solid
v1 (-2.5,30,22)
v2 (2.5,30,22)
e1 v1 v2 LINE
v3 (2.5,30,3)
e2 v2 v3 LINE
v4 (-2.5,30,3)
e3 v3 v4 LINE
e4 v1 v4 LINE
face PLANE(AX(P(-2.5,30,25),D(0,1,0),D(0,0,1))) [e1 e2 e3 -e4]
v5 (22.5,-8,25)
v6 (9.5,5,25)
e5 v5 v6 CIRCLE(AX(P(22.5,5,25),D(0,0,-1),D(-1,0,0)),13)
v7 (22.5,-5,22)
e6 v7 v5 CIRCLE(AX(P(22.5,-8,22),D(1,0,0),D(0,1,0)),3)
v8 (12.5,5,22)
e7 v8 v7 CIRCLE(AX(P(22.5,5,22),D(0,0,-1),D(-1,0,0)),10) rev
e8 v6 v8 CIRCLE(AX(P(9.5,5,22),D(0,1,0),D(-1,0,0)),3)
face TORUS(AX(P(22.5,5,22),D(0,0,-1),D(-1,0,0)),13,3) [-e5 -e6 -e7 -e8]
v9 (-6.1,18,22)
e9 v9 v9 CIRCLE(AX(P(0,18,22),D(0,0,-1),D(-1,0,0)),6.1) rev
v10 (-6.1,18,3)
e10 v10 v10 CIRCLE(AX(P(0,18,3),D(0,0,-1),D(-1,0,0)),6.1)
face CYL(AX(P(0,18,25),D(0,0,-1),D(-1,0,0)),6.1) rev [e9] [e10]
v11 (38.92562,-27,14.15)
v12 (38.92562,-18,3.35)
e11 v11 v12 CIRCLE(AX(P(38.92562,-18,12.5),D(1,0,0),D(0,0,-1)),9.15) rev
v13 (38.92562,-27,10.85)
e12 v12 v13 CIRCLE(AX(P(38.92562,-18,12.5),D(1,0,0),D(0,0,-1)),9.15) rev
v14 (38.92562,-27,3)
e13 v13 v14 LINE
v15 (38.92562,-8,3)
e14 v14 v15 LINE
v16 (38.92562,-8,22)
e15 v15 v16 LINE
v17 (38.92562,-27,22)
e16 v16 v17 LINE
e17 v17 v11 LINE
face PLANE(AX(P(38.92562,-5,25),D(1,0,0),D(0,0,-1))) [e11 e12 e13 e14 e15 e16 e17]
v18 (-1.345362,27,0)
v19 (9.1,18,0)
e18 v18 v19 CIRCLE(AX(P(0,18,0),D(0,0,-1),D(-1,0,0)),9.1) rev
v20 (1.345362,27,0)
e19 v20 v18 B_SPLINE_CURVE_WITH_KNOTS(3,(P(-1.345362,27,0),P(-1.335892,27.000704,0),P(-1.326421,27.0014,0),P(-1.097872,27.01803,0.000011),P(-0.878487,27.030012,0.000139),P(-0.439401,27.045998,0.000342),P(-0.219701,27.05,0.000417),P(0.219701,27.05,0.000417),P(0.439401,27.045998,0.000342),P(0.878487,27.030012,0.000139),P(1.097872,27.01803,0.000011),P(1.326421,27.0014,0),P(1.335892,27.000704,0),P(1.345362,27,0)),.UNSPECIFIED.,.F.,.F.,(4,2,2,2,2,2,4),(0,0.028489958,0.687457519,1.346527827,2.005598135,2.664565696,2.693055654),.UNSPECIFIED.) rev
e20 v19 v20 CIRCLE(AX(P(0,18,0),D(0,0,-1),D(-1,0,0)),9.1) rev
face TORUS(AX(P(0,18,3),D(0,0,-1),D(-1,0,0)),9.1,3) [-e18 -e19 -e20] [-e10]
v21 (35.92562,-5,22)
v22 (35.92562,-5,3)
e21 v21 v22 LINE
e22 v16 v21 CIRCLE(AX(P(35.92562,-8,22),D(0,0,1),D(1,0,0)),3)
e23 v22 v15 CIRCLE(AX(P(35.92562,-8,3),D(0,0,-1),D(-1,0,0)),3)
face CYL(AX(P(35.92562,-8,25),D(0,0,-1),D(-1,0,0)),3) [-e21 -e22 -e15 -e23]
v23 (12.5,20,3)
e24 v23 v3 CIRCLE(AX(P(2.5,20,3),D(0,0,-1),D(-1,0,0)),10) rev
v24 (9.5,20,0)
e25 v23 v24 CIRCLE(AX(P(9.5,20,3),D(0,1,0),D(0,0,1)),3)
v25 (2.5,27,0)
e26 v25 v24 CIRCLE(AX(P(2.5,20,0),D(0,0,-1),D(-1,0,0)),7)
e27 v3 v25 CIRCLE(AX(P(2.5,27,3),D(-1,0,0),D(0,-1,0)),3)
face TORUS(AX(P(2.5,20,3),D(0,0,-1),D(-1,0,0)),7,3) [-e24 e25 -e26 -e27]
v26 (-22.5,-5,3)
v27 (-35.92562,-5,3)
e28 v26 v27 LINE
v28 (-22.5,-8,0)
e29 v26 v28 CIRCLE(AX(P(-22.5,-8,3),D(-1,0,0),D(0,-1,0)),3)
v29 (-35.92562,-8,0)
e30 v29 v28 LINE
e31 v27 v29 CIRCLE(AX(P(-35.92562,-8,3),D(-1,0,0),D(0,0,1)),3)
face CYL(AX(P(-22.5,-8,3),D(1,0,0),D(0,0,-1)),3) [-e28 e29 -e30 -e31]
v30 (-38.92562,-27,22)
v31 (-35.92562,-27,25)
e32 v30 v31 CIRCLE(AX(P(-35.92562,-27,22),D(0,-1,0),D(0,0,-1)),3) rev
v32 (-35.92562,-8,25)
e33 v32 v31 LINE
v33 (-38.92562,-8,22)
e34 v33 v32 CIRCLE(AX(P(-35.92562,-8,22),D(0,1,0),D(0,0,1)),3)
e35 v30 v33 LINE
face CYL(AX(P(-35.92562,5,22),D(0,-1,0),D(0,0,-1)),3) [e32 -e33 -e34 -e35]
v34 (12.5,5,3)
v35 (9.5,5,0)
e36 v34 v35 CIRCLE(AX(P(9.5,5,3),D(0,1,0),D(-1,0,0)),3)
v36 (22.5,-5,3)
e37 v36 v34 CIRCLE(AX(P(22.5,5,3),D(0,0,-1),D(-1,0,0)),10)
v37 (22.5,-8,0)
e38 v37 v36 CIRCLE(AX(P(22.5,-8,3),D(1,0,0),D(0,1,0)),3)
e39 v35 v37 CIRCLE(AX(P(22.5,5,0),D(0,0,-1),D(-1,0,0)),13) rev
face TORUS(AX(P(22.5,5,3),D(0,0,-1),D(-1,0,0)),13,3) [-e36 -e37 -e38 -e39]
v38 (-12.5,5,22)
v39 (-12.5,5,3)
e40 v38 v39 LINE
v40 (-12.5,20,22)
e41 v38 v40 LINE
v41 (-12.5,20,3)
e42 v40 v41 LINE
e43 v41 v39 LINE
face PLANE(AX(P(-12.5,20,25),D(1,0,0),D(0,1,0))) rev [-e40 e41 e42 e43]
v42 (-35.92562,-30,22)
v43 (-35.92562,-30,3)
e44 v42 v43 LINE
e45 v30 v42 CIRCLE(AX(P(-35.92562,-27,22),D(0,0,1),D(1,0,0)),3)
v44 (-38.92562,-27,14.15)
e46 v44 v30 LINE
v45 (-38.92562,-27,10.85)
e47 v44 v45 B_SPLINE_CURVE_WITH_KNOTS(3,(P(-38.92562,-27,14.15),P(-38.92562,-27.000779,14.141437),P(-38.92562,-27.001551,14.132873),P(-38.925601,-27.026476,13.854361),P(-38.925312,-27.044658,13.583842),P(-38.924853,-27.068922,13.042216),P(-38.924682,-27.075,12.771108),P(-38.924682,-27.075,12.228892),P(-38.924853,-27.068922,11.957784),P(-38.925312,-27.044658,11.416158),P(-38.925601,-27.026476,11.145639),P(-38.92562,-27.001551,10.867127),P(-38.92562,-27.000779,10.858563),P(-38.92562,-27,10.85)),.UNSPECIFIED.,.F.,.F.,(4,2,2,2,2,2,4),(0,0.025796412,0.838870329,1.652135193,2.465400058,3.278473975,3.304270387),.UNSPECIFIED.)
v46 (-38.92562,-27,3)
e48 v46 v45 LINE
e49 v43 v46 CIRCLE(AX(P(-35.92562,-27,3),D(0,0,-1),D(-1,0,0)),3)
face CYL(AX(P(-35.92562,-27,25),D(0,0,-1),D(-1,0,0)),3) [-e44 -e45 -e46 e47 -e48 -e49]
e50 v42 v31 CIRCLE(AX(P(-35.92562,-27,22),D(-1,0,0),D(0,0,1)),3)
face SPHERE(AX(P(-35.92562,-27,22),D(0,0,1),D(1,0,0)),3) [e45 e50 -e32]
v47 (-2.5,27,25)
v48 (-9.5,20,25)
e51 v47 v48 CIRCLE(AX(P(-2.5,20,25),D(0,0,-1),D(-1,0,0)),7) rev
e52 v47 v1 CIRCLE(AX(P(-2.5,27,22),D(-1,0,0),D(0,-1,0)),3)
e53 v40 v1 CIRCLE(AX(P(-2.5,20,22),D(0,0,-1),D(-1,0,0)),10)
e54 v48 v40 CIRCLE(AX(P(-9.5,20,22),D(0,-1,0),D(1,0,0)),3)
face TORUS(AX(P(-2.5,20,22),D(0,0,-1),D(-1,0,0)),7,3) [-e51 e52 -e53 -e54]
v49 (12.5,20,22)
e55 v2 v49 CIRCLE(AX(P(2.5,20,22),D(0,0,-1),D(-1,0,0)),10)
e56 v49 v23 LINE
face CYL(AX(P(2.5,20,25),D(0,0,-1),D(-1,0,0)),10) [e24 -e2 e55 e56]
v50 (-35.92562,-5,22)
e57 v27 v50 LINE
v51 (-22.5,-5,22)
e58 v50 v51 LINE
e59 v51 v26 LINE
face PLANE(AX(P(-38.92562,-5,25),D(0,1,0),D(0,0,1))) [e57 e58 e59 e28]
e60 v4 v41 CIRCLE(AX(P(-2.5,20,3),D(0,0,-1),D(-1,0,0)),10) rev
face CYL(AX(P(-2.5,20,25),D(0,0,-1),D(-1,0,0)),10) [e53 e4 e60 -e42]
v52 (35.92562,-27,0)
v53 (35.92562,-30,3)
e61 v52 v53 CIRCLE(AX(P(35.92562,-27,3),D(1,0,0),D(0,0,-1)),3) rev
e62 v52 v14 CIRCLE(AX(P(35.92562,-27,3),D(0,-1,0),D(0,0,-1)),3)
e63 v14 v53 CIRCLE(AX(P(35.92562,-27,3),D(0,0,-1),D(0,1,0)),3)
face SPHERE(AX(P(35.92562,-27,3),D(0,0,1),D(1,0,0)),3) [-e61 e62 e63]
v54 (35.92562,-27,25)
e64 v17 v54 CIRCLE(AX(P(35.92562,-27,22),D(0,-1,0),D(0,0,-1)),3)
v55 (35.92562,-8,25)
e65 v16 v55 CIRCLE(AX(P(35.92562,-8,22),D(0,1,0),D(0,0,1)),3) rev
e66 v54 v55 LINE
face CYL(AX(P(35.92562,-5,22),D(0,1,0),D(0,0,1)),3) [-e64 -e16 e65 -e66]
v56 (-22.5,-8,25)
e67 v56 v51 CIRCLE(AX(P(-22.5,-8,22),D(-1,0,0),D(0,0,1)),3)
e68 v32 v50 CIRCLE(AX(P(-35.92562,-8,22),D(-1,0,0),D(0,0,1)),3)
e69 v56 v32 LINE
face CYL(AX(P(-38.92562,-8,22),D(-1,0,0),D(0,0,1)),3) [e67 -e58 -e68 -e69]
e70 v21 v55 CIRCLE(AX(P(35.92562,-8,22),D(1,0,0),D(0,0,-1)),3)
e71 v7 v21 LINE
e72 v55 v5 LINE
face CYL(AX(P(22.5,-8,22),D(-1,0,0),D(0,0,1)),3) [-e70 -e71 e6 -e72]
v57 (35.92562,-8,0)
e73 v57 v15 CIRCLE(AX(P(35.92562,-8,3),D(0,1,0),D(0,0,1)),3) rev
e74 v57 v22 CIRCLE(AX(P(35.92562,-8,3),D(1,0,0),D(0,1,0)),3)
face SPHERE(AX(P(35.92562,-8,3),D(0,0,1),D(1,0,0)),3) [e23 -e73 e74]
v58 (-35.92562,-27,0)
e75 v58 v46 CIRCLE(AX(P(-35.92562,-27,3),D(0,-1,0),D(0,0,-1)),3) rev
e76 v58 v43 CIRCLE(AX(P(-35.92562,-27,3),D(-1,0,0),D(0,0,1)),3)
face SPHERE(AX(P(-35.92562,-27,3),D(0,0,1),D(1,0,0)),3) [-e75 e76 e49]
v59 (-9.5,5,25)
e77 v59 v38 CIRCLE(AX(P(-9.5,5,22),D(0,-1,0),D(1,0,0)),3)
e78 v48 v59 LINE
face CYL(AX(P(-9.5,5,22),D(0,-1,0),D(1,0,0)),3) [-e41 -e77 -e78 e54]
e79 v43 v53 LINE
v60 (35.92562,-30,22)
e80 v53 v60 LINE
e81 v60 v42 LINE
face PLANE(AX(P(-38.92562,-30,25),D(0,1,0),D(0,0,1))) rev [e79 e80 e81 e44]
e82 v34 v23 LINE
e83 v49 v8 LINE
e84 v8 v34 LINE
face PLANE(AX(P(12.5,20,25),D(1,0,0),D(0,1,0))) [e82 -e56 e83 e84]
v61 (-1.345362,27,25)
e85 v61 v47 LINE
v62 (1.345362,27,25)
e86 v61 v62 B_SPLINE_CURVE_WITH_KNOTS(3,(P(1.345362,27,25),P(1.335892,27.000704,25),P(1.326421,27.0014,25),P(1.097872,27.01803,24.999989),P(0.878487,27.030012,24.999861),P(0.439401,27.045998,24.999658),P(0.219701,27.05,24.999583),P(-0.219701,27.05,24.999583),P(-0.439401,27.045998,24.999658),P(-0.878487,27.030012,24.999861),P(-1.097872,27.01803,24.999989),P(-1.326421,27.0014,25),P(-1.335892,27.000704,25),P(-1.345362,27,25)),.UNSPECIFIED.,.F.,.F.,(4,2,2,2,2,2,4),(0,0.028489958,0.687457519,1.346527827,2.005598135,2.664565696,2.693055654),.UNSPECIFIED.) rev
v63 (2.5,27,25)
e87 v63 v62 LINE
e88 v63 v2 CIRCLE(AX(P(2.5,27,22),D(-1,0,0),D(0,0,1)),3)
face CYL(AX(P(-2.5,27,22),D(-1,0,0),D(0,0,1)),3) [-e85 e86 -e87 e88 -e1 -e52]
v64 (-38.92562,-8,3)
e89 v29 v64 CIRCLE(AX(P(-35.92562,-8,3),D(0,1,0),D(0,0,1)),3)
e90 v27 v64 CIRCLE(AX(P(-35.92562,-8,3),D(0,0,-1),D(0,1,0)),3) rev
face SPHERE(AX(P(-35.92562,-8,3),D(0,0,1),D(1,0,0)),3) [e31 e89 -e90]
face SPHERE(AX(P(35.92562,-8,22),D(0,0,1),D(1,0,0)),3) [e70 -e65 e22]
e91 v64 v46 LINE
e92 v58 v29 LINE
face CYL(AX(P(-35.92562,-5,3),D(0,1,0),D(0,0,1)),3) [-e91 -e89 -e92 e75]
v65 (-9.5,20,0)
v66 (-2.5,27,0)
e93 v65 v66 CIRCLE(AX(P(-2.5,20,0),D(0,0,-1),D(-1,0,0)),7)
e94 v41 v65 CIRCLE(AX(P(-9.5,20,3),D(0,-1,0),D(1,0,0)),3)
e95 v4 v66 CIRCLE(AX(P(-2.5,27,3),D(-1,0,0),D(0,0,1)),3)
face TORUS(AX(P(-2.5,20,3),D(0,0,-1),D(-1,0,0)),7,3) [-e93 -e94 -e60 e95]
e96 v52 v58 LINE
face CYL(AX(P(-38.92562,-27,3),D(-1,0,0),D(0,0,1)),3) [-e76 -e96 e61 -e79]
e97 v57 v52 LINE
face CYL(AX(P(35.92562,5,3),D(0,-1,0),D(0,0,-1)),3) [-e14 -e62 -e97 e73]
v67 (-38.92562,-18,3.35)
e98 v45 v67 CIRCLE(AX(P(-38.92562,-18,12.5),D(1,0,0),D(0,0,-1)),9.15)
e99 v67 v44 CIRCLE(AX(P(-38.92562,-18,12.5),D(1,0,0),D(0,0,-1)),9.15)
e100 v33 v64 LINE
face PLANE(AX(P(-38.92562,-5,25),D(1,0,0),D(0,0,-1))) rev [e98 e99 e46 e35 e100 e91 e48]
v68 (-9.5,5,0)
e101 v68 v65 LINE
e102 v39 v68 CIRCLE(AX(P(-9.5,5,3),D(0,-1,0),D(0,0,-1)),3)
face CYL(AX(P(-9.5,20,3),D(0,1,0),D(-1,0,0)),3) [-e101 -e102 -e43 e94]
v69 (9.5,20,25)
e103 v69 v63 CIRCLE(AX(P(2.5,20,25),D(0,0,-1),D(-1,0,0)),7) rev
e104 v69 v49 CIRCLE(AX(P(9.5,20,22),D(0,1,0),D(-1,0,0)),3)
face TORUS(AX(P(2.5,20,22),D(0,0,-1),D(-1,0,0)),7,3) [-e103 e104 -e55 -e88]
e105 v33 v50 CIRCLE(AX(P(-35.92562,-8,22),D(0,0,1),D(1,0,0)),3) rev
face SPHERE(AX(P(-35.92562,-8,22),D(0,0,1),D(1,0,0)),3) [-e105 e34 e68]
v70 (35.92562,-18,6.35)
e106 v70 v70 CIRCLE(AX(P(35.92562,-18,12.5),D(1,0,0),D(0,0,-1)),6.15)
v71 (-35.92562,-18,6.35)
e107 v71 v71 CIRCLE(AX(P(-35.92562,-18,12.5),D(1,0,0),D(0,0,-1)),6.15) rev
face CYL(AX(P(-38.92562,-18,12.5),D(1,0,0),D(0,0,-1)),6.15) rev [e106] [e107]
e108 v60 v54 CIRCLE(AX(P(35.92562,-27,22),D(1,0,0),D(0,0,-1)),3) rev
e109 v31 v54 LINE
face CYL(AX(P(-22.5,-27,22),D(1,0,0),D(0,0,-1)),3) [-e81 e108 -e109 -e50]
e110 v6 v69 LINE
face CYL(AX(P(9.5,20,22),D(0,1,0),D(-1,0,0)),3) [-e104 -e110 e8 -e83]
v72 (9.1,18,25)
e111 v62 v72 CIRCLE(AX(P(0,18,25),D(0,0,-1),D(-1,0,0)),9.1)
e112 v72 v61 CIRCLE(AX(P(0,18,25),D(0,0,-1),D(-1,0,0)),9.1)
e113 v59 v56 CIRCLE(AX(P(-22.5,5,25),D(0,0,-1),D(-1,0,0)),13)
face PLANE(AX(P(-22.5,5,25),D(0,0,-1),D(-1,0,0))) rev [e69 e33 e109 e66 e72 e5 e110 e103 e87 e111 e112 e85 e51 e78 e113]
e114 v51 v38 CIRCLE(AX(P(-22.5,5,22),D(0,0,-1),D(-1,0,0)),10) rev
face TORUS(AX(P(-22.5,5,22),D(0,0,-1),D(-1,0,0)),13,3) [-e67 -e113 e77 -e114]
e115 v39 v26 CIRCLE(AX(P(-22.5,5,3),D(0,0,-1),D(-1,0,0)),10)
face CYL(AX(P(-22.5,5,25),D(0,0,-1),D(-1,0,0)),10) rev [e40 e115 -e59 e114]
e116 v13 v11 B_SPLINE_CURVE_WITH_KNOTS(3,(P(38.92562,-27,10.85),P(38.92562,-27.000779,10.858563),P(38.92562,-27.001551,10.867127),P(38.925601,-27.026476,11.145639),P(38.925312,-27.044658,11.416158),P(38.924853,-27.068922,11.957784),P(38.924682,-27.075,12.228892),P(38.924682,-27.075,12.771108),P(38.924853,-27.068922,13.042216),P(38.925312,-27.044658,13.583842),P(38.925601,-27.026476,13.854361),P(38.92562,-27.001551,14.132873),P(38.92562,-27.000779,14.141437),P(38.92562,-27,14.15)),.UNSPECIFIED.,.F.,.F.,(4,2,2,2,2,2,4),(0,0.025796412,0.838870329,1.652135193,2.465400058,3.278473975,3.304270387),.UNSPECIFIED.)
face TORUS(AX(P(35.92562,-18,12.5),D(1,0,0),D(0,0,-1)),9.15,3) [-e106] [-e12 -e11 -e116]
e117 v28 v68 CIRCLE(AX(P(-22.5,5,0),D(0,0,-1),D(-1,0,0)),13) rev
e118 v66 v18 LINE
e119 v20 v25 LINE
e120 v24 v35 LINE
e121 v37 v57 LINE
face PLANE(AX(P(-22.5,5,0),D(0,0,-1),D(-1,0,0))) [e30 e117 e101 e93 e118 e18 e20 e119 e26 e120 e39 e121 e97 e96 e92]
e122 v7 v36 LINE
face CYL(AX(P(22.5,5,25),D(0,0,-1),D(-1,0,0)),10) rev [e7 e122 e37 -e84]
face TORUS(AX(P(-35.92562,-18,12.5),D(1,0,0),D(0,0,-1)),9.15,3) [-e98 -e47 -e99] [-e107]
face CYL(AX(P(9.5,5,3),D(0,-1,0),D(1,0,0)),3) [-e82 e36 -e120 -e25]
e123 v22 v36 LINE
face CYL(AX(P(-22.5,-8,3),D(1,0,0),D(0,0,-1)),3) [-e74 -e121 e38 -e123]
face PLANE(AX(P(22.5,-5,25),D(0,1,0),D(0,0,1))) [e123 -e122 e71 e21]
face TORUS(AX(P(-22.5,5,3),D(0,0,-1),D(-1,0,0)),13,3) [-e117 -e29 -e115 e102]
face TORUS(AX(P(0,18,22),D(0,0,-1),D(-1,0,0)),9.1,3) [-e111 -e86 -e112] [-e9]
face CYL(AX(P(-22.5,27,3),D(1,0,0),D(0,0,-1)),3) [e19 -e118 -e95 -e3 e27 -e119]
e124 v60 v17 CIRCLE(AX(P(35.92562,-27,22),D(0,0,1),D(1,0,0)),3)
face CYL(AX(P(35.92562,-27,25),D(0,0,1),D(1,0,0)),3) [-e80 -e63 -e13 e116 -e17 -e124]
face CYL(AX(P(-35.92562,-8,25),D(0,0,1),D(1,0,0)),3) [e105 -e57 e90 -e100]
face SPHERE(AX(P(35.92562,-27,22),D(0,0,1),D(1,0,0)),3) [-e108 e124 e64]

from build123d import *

# Parameters (mm, degrees)
SKETCH1_R           = 6.1
BOSS_EXTRUDE1_DEPTH = 25
SKETCH2_R           = 6.15
CUT_EXTRUDE1_DEPTH  = 88.09658729287669
FILLET1_R           = 3


with BuildPart() as part:
    # Sketch1 → Boss-Extrude1 (new body)
    with BuildSketch(Plane.XY):
        with BuildLine():
            Line((22.500000000000078, -5.000000000000004), (38.925619834710695, -5.000000000000004))
            Line((38.925619834710695, -5.000000000000004), (38.925619834710695, -30.000000000000007))
            Line((38.925619834710695, -30.000000000000007), (-38.92561983471068, -30.000000000000007))
            Line((-38.92561983471068, -30.000000000000007), (-38.92561983471068, -5.000000000000004))
            Line((-38.92561983471068, -5.000000000000004), (-22.500000000000068, -5.000000000000004))
            ThreePointArc((-22.500000000000068, -5.000000000000004), (-15.42893218813452, -2.0710678118654817), (-12.499999999999995, 5.000000000000067))
            Line((-12.499999999999995, 5.000000000000067), (-12.499999999999998, 19.99999999999993))
            ThreePointArc((-12.499999999999998, 19.99999999999993), (-9.571067811865476, 27.071067811865476), (-2.4999999999999294, 30))
            Line((-2.4999999999999294, 30), (2.499999999999931, 30))
            ThreePointArc((2.499999999999931, 30), (9.571067811865479, 27.071067811865476), (12.500000000000002, 19.99999999999993))
            Line((12.500000000000002, 19.99999999999993), (12.500000000000005, 5.000000000000065))
            ThreePointArc((12.500000000000005, 5.000000000000065), (15.428932188134532, -2.0710678118654826), (22.500000000000078, -5.000000000000004))
        make_face()
        with Locations((3.04e-15, 18)):
            Circle(SKETCH1_R, mode=Mode.SUBTRACT)
    extrude(amount=BOSS_EXTRUDE1_DEPTH)

    # Sketch2 → Cut-Extrude1 (cut, through all)
    with BuildSketch(Plane(origin=(38.925619834710695, 0, 0), x_dir=(0, 0, -1), z_dir=(1, 0, 0))):
        with Locations((-12.499999999999998, -18.000000000000007)):
            Circle(SKETCH2_R)
    extrude(amount=-CUT_EXTRUDE1_DEPTH, mode=Mode.SUBTRACT)

    # Fillet1
    # the kernel refuses this fillet: 3 mm, written as the material it takes off along each edge
    with BuildSketch(Plane(origin=(-35.92561983471068, -8.000000000000004, 22), x_dir=(0, 1, 0), z_dir=(-1, 0, 0))) as fillet1_piece_1_section:
        Polygon((0, 0), (FILLET1_R, 0), (FILLET1_R, -FILLET1_R), (0, -FILLET1_R), align=None)
    fillet1_piece_1 = extrude(amount=FILLET1_R, mode=Mode.PRIVATE)
    fillet1_piece_1 = fillet1_piece_1 - Plane(origin=(-35.92561983471068, -8.000000000000004, 22), x_dir=(0, -0.7071067811865475, -0.7071067811865475), z_dir=(-1, 0, 0)) * Sphere(FILLET1_R, mode=Mode.PRIVATE)
    add(fillet1_piece_1, mode=Mode.SUBTRACT)
    with BuildSketch(Plane(origin=(35.925619834710695, -8.000000000000004, 3), x_dir=(1, 0, 0), z_dir=(0, 1, 0))) as fillet1_piece_2_section:
        Polygon((0, 0), (FILLET1_R, 0), (FILLET1_R, FILLET1_R), (0, FILLET1_R), align=None)
    fillet1_piece_2 = extrude(amount=FILLET1_R, mode=Mode.PRIVATE)
    fillet1_piece_2 = fillet1_piece_2 - Plane(origin=(35.925619834710695, -8.000000000000004, 3), x_dir=(-0.7071067811865475, 0, 0.7071067811865475), z_dir=(0, 1, 0)) * Sphere(FILLET1_R, mode=Mode.PRIVATE)
    add(fillet1_piece_2, mode=Mode.SUBTRACT)
    with BuildSketch(Plane(origin=(-35.92561983471068, -27.000000000000007, 22), x_dir=(0, 0, 1), z_dir=(-1, 0, 0))) as fillet1_piece_3_section:
        Polygon((0, 0), (FILLET1_R, 0), (FILLET1_R, -FILLET1_R), (0, -FILLET1_R), align=None)
    fillet1_piece_3 = extrude(amount=FILLET1_R, mode=Mode.PRIVATE)
    fillet1_piece_3 = fillet1_piece_3 - Plane(origin=(-35.92561983471068, -27.000000000000007, 22), x_dir=(0, 0.7071067811865475, -0.7071067811865475), z_dir=(-1, 0, 0)) * Sphere(FILLET1_R, mode=Mode.PRIVATE)
    add(fillet1_piece_3, mode=Mode.SUBTRACT)
    with BuildSketch(Plane(origin=(35.925619834710695, -27.000000000000007, 3), x_dir=(0, 0, -1), z_dir=(1, 0, 0))) as fillet1_piece_4_section:
        Polygon((0, 0), (FILLET1_R, 0), (FILLET1_R, -FILLET1_R), (0, -FILLET1_R), align=None)
    fillet1_piece_4 = extrude(amount=FILLET1_R, mode=Mode.PRIVATE)
    fillet1_piece_4 = fillet1_piece_4 - Plane(origin=(35.925619834710695, -27.000000000000007, 3), x_dir=(0, 0.7071067811865475, 0.7071067811865475), z_dir=(1, 0, 0)) * Sphere(FILLET1_R, mode=Mode.PRIVATE)
    add(fillet1_piece_4, mode=Mode.SUBTRACT)
    with BuildSketch(Plane(origin=(-35.92561983471068, -27.000000000000007, 3), x_dir=(0, 0, -1), z_dir=(-1, 0, 0))) as fillet1_piece_5_section:
        Polygon((0, 0), (FILLET1_R, 0), (FILLET1_R, FILLET1_R), (0, FILLET1_R), align=None)
    fillet1_piece_5 = extrude(amount=FILLET1_R, mode=Mode.PRIVATE)
    fillet1_piece_5 = fillet1_piece_5 - Plane(origin=(-35.92561983471068, -27.000000000000007, 3), x_dir=(0, 0.7071067811865475, 0.7071067811865475), z_dir=(-1, 0, 0)) * Sphere(FILLET1_R, mode=Mode.PRIVATE)
    add(fillet1_piece_5, mode=Mode.SUBTRACT)
    with BuildSketch(Plane(origin=(-35.92561983471068, -8.000000000000004, 3), x_dir=(0, 1, 0), z_dir=(-1, 0, 0))) as fillet1_piece_6_section:
        Polygon((0, 0), (FILLET1_R, 0), (FILLET1_R, FILLET1_R), (0, FILLET1_R), align=None)
    fillet1_piece_6 = extrude(amount=FILLET1_R, mode=Mode.PRIVATE)
    fillet1_piece_6 = fillet1_piece_6 - Plane(origin=(-35.92561983471068, -8.000000000000004, 3), x_dir=(0, -0.7071067811865475, 0.7071067811865475), z_dir=(-1, 0, 0)) * Sphere(FILLET1_R, mode=Mode.PRIVATE)
    add(fillet1_piece_6, mode=Mode.SUBTRACT)
    with BuildSketch(Plane(origin=(35.925619834710695, -27.000000000000007, 22), x_dir=(0, 0, 1), z_dir=(1, 0, 0))) as fillet1_piece_7_section:
        Polygon((0, 0), (FILLET1_R, 0), (FILLET1_R, FILLET1_R), (0, FILLET1_R), align=None)
    fillet1_piece_7 = extrude(amount=FILLET1_R, mode=Mode.PRIVATE)
    fillet1_piece_7 = fillet1_piece_7 - Plane(origin=(35.925619834710695, -27.000000000000007, 22), x_dir=(0, 0.7071067811865475, -0.7071067811865475), z_dir=(1, 0, 0)) * Sphere(FILLET1_R, mode=Mode.PRIVATE)
    add(fillet1_piece_7, mode=Mode.SUBTRACT)
    with BuildSketch(Plane(origin=(35.925619834710695, -8.000000000000004, 22), x_dir=(1, 0, 0), z_dir=(0, 1, 0))) as fillet1_piece_8_section:
        Polygon((0, 0), (FILLET1_R, 0), (FILLET1_R, -FILLET1_R), (0, -FILLET1_R), align=None)
    fillet1_piece_8 = extrude(amount=FILLET1_R, mode=Mode.PRIVATE)
    fillet1_piece_8 = fillet1_piece_8 - Plane(origin=(35.925619834710695, -8.000000000000004, 22), x_dir=(-0.7071067811865475, 0, -0.7071067811865475), z_dir=(0, 1, 0)) * Sphere(FILLET1_R, mode=Mode.PRIVATE)
    add(fillet1_piece_8, mode=Mode.SUBTRACT)
    with BuildSketch(Plane(origin=(-35.92561983471068, -5.000000000000004, 25), x_dir=(0, -1, 0), z_dir=(1, 0, 0))) as fillet1_piece_9:
        with BuildLine():
            CenterArc((FILLET1_R, FILLET1_R), FILLET1_R, 180, 90)
            Line((-8.9e-16, FILLET1_R), (0, 0))
            Line((0, 0), (FILLET1_R, 0))
        make_face()
    extrude(amount=13.425619834710613, mode=Mode.SUBTRACT)
    with BuildSketch(Plane(origin=(-2.499999999999999, 20, 0), x_dir=(-1, -7.11e-15, 0), z_dir=(7.11e-15, -1, 0))) as fillet1_piece_10:
        with BuildLine():
            CenterArc((10 - FILLET1_R, -FILLET1_R), FILLET1_R, 8.48e-15, 90)
            Line((10, -FILLET1_R), (10, 0))
            Line((10, 0), (10 - FILLET1_R, 0))
        make_face()
    revolve(axis=Axis((-2.499999999999999, 20, 0), (0, 0, -1)), revolution_arc=90.00000000000081, mode=Mode.SUBTRACT)
    with BuildSketch(Plane(origin=(-2.4999999999999294, 30, 0), x_dir=(0, -1, 0), z_dir=(1, 0, 0))) as fillet1_piece_11:
        with BuildLine():
            CenterArc((FILLET1_R, -FILLET1_R), FILLET1_R, 90, 90)
            Line((0, -FILLET1_R), (0, 0))
            Line((0, 0), (FILLET1_R, 0))
        make_face()
    extrude(amount=4.999999999999861, mode=Mode.SUBTRACT)
    with BuildSketch(Plane(origin=(2.500000000000006, 20.000000000000007, 0), x_dir=(-7.51e-15, 1, 0), z_dir=(-1, -7.51e-15, 0))) as fillet1_piece_12:
        with BuildLine():
            CenterArc((9.999999999999993 - FILLET1_R, -FILLET1_R), FILLET1_R, 8.48e-15, 90)
            Line((9.999999999999993, -FILLET1_R), (9.999999999999993, 0))
            Line((9.999999999999993, 0), (9.999999999999993 - FILLET1_R, 0))
        make_face()
    revolve(axis=Axis((2.500000000000006, 20.000000000000007, 0), (0, 0, -1)), revolution_arc=90.00000000000088, mode=Mode.SUBTRACT)
    with BuildSketch(Plane(origin=(12.500000000000002, 19.99999999999993, 0), x_dir=(-1, -2.4e-16, 0), z_dir=(2.4e-16, -1, 0))) as fillet1_piece_13:
        with BuildLine():
            CenterArc((FILLET1_R, -FILLET1_R), FILLET1_R, 90, 90)
            Line((0, -FILLET1_R), (0, 0))
            Line((0, 0), (FILLET1_R, 0))
        make_face()
    extrude(amount=14.999999999999865, mode=Mode.SUBTRACT)
    with BuildSketch(Plane(origin=(22.500000000000004, 4.999999999999995, 0), x_dir=(-1, 7.02e-15, 0), z_dir=(7.02e-15, 1, 0))) as fillet1_piece_14:
        with BuildLine():
            CenterArc((9.999999999999998 + FILLET1_R, FILLET1_R), FILLET1_R, 180, 90)
            Line((9.999999999999998 + FILLET1_R, -4.4e-16), (9.999999999999998, 0))
            Line((9.999999999999998, 0), (9.999999999999998, FILLET1_R))
        make_face()
    revolve(axis=Axis((22.500000000000004, 4.999999999999995, 0), (0, 0, 1)), revolution_arc=90.00000000000082, mode=Mode.SUBTRACT)
    with BuildSketch(Plane(origin=(22.500000000000078, -5.000000000000004, 0), x_dir=(0, 3e-16, 1), z_dir=(1, 0, 0))) as fillet1_piece_15:
        with BuildLine():
            CenterArc((FILLET1_R, FILLET1_R), FILLET1_R, 180, 90)
            Line((-1.33e-15, FILLET1_R), (0, 0))
            Line((0, 0), (FILLET1_R, 0))
        make_face()
    extrude(amount=13.425619834710616, mode=Mode.SUBTRACT)
    with BuildSketch(Plane(origin=(-38.92561983471068, -27.000000000000007, 25), x_dir=(1, 0, 0), z_dir=(0, 1, 0))) as fillet1_piece_16:
        with BuildLine():
            CenterArc((FILLET1_R, FILLET1_R), FILLET1_R, 180, 90)
            Line((0, FILLET1_R), (0, 0))
            Line((0, 0), (FILLET1_R, 0))
        make_face()
    extrude(amount=19.000000000000004, mode=Mode.SUBTRACT)
    with BuildSketch(Plane(origin=(38.925619834710695, -8.000000000000004, 0), x_dir=(0, 0, 1), z_dir=(0, -1, 0))) as fillet1_piece_17:
        with BuildLine():
            CenterArc((FILLET1_R, FILLET1_R), FILLET1_R, 180, 90)
            Line((-4.4e-16, FILLET1_R), (0, 0))
            Line((0, 0), (FILLET1_R, 0))
        make_face()
    extrude(amount=19.000000000000004, mode=Mode.SUBTRACT)
    with BuildSketch(Plane(origin=(35.925619834710695, -30.000000000000007, 0), x_dir=(0, 1, 0), z_dir=(-1, 0, 0))) as fillet1_piece_18:
        with BuildLine():
            CenterArc((FILLET1_R, -FILLET1_R), FILLET1_R, 90, 90)
            Line((0, -FILLET1_R), (0, 0))
            Line((0, 0), (FILLET1_R, 0))
        make_face()
    extrude(amount=71.85123966942137, mode=Mode.SUBTRACT)
    with BuildSketch(Plane(origin=(-38.92561983471068, -27.000000000000007, 0), x_dir=(1, 0, 0), z_dir=(0, 1, 0))) as fillet1_piece_19:
        with BuildLine():
            CenterArc((FILLET1_R, -FILLET1_R), FILLET1_R, 90, 90)
            Line((0, -FILLET1_R), (0, 0))
            Line((0, 0), (FILLET1_R, 0))
        make_face()
    extrude(amount=19.000000000000004, mode=Mode.SUBTRACT)
    with BuildSketch(Plane(origin=(-35.92561983471068, -5.000000000000004, 0), x_dir=(0, -1, 0), z_dir=(1, 0, 0))) as fillet1_piece_20:
        with BuildLine():
            CenterArc((FILLET1_R, -FILLET1_R), FILLET1_R, 90, 90)
            Line((-8.9e-16, -FILLET1_R), (0, 0))
            Line((0, 0), (FILLET1_R, 0))
        make_face()
    extrude(amount=13.425619834710613, mode=Mode.SUBTRACT)
    with BuildSketch(Plane(origin=(-22.499999999999993, 4.999999999999993, 0), x_dir=(-7.46e-15, -1, 0), z_dir=(-1, 7.46e-15, 0))) as fillet1_piece_21:
        with BuildLine():
            CenterArc((9.999999999999998 + FILLET1_R, FILLET1_R), FILLET1_R, 180, 90)
            Line((9.999999999999998, FILLET1_R), (9.999999999999998, 0))
            Line((9.999999999999998, 0), (9.999999999999998 + FILLET1_R, 0))
        make_face()
    revolve(axis=Axis((-22.499999999999993, 4.999999999999993, 0), (0, 0, 1)), revolution_arc=90.00000000000085, mode=Mode.SUBTRACT)
    with BuildSketch(Plane(origin=(-12.499999999999995, 5.000000000000067, 0), x_dir=(1, 2.4e-16, 0), z_dir=(-2.4e-16, 1, 0))) as fillet1_piece_22:
        with BuildLine():
            CenterArc((FILLET1_R, -FILLET1_R), FILLET1_R, 90, 90)
            Line((0, -FILLET1_R), (0, 0))
            Line((0, 0), (FILLET1_R, 0))
        make_face()
    extrude(amount=14.999999999999861, mode=Mode.SUBTRACT)
    with BuildSketch(Plane(origin=(35.925619834710695, -30.000000000000007, 25), x_dir=(0, 1, 0), z_dir=(-1, 0, 0))) as fillet1_piece_23:
        with BuildLine():
            CenterArc((FILLET1_R, FILLET1_R), FILLET1_R, 180, 90)
            Line((0, FILLET1_R), (0, 0))
            Line((0, 0), (FILLET1_R, 0))
        make_face()
    extrude(amount=71.85123966942137, mode=Mode.SUBTRACT)
    with BuildSketch(Plane(origin=(38.925619834710695, -8.000000000000004, 25), x_dir=(0, 0, -1), z_dir=(0, -1, 0))) as fillet1_piece_24:
        with BuildLine():
            CenterArc((FILLET1_R, -FILLET1_R), FILLET1_R, 90, 90)
            Line((0, -FILLET1_R), (0, 0))
            Line((0, 0), (FILLET1_R, 0))
        make_face()
    extrude(amount=19.000000000000004, mode=Mode.SUBTRACT)
    with BuildSketch(Plane(origin=(38.925619834710695, -5.000000000000004, 3), x_dir=(-1, 3e-16, 0), z_dir=(0, 0, 1))) as fillet1_piece_25:
        with BuildLine():
            CenterArc((FILLET1_R, FILLET1_R), FILLET1_R, 180, 90)
            Line((-8.9e-16, FILLET1_R), (0, 0))
            Line((0, 0), (FILLET1_R, 0))
        make_face()
    extrude(amount=19, mode=Mode.SUBTRACT)
    with BuildSketch(Plane(origin=(38.925619834710695, -30.000000000000007, 3), x_dir=(0, 1, 0), z_dir=(0, 0, 1))) as fillet1_piece_26:
        with BuildLine():
            CenterArc((FILLET1_R, FILLET1_R), FILLET1_R, 180, 90)
            Line((0, FILLET1_R), (0, 0))
            Line((0, 0), (FILLET1_R, 0))
        make_face()
    extrude(amount=19, mode=Mode.SUBTRACT)
    with BuildSketch(Plane(origin=(-38.92561983471068, -30.000000000000007, 3), x_dir=(1, 0, 0), z_dir=(0, 0, 1))) as fillet1_piece_27:
        with BuildLine():
            CenterArc((FILLET1_R, FILLET1_R), FILLET1_R, 180, 90)
            Line((0, FILLET1_R), (0, 0))
            Line((0, 0), (FILLET1_R, 0))
        make_face()
    extrude(amount=19, mode=Mode.SUBTRACT)
    with BuildSketch(Plane(origin=(-38.92561983471068, -5.000000000000004, 3), x_dir=(0, -1, 0), z_dir=(0, 0, 1))) as fillet1_piece_28:
        with BuildLine():
            CenterArc((FILLET1_R, FILLET1_R), FILLET1_R, 180, 90)
            Line((-8.9e-16, FILLET1_R), (0, 0))
            Line((0, 0), (FILLET1_R, 0))
        make_face()
    extrude(amount=19, mode=Mode.SUBTRACT)
    with BuildSketch(Plane(origin=(22.500000000000078, -5.000000000000004, 25), x_dir=(0, 3e-16, -1), z_dir=(1, 0, 0))) as fillet1_piece_29:
        with BuildLine():
            CenterArc((FILLET1_R, -FILLET1_R), FILLET1_R, 89.99999999999999, 90.00000000000001)
            Line((-8.9e-16, -FILLET1_R), (0, 0))
            Line((0, 0), (FILLET1_R, 0))
        make_face()
    extrude(amount=13.425619834710616, mode=Mode.SUBTRACT)
    with BuildSketch(Plane(origin=(22.500000000000004, 4.999999999999995, 25), x_dir=(-1, 7.02e-15, 0), z_dir=(7.02e-15, 1, 0))) as fillet1_piece_30:
        with BuildLine():
            CenterArc((9.999999999999998 + FILLET1_R, -FILLET1_R), FILLET1_R, 90, 90)
            Line((9.999999999999998 + FILLET1_R, 0), (9.999999999999998, 0))
            Line((9.999999999999998, 0), (9.999999999999998, -FILLET1_R))
        make_face()
    revolve(axis=Axis((22.500000000000004, 4.999999999999995, 25), (0, 0, 1)), revolution_arc=90.00000000000082, mode=Mode.SUBTRACT)
    with BuildSketch(Plane(origin=(12.500000000000002, 19.99999999999993, 25), x_dir=(-1, -2.4e-16, 0), z_dir=(2.4e-16, -1, 0))) as fillet1_piece_31:
        with BuildLine():
            CenterArc((FILLET1_R, FILLET1_R), FILLET1_R, 180, 90)
            Line((0, FILLET1_R), (0, 0))
            Line((0, 0), (FILLET1_R, 0))
        make_face()
    extrude(amount=14.999999999999865, mode=Mode.SUBTRACT)
    with BuildSketch(Plane(origin=(3.04e-15, 18, 0), x_dir=(1, 0, 0), z_dir=(0, -1, 0))) as fillet1_piece_32:
        with BuildLine():
            CenterArc((6.1 + FILLET1_R, FILLET1_R), FILLET1_R, 180, 90)
            Line((6.099999999999999, FILLET1_R), (6.1, 0))
            Line((6.1, 0), (6.1 + FILLET1_R, 0))
        make_face()
    revolve(axis=Axis((3.04e-15, 18, 0), (0, 0, 1)), mode=Mode.SUBTRACT)
    with BuildSketch(Plane(origin=(3.04e-15, 18, 25), x_dir=(1, 0, 0), z_dir=(0, -1, 0))) as fillet1_piece_33:
        with BuildLine():
            CenterArc((6.1 + FILLET1_R, -FILLET1_R), FILLET1_R, 90, 90)
            Line((6.099999999999999, -FILLET1_R), (6.1, 0))
            Line((6.1, 0), (6.1 + FILLET1_R, 0))
        make_face()
    revolve(axis=Axis((3.04e-15, 18, 25), (0, 0, 1)), mode=Mode.SUBTRACT)
    with BuildSketch(Plane(origin=(2.500000000000006, 20.000000000000007, 25), x_dir=(-7.51e-15, 1, 0), z_dir=(-1, -7.51e-15, 0))) as fillet1_piece_34:
        with BuildLine():
            CenterArc((9.999999999999993 - FILLET1_R, FILLET1_R), FILLET1_R, 270, 90)
            Line((9.999999999999993, FILLET1_R), (9.999999999999993, 0))
            Line((9.999999999999993, 0), (9.999999999999993 - FILLET1_R, 0))
        make_face()
    revolve(axis=Axis((2.500000000000006, 20.000000000000007, 25), (0, 0, -1)), revolution_arc=90.00000000000088, mode=Mode.SUBTRACT)
    with BuildSketch(Plane(origin=(-2.4999999999999294, 30, 25), x_dir=(0, -1, 0), z_dir=(1, 0, 0))) as fillet1_piece_35:
        with BuildLine():
            CenterArc((FILLET1_R, FILLET1_R), FILLET1_R, 180, 90)
            Line((0, FILLET1_R), (0, 0))
            Line((0, 0), (FILLET1_R, 0))
        make_face()
    extrude(amount=4.999999999999861, mode=Mode.SUBTRACT)
    with BuildSketch(Plane(origin=(-2.499999999999999, 20, 25), x_dir=(-1, -7.11e-15, 0), z_dir=(7.11e-15, -1, 0))) as fillet1_piece_36:
        with BuildLine():
            CenterArc((10 - FILLET1_R, FILLET1_R), FILLET1_R, 270, 90)
            Line((10, FILLET1_R), (10, 0))
            Line((10, 0), (10 - FILLET1_R, 0))
        make_face()
    revolve(axis=Axis((-2.499999999999999, 20, 25), (0, 0, -1)), revolution_arc=90.00000000000081, mode=Mode.SUBTRACT)
    with BuildSketch(Plane(origin=(-38.92561983471068, -18.000000000000007, 12.499999999999998), x_dir=(0, 0, -1), z_dir=(0, -1, 0))) as fillet1_piece_37:
        with BuildLine():
            CenterArc((6.15 + FILLET1_R, FILLET1_R), FILLET1_R, 180, 90)
            Line((6.15 + FILLET1_R, 0), (6.15, 0))
            Line((6.15, 0), (6.15, FILLET1_R))
        make_face()
    revolve(axis=Axis((-38.92561983471068, -18.000000000000007, 12.499999999999998), (1, 0, 0)), mode=Mode.SUBTRACT)
    with BuildSketch(Plane(origin=(38.925619834710695, -18.000000000000007, 12.499999999999998), x_dir=(0, 0, -1), z_dir=(0, -1, 0))) as fillet1_piece_38:
        with BuildLine():
            CenterArc((6.15 + FILLET1_R, -FILLET1_R), FILLET1_R, 90, 90)
            Line((6.15, -FILLET1_R), (6.15, 0))
            Line((6.15, 0), (6.15 + FILLET1_R, 0))
        make_face()
    revolve(axis=Axis((38.925619834710695, -18.000000000000007, 12.499999999999998), (1, 0, 0)), mode=Mode.SUBTRACT)
    with BuildSketch(Plane(origin=(-12.499999999999995, 5.000000000000067, 25), x_dir=(1, 2.4e-16, 0), z_dir=(-2.4e-16, 1, 0))) as fillet1_piece_39:
        with BuildLine():
            CenterArc((FILLET1_R, FILLET1_R), FILLET1_R, 180, 90)
            Line((0, FILLET1_R), (0, 0))
            Line((0, 0), (FILLET1_R, 0))
        make_face()
    extrude(amount=14.999999999999861, mode=Mode.SUBTRACT)
    with BuildSketch(Plane(origin=(-22.499999999999993, 4.999999999999993, 25), x_dir=(-7.46e-15, -1, 0), z_dir=(-1, 7.46e-15, 0))) as fillet1_piece_40:
        with BuildLine():
            CenterArc((9.999999999999998 + FILLET1_R, -FILLET1_R), FILLET1_R, 90, 90)
            Line((9.999999999999998, -FILLET1_R), (9.999999999999998, 0))
            Line((9.999999999999998, 0), (9.999999999999998 + FILLET1_R, 0))
        make_face()
    revolve(axis=Axis((-22.499999999999993, 4.999999999999993, 25), (0, 0, 1)), revolution_arc=90.00000000000085, mode=Mode.SUBTRACT)


solid = part.part
